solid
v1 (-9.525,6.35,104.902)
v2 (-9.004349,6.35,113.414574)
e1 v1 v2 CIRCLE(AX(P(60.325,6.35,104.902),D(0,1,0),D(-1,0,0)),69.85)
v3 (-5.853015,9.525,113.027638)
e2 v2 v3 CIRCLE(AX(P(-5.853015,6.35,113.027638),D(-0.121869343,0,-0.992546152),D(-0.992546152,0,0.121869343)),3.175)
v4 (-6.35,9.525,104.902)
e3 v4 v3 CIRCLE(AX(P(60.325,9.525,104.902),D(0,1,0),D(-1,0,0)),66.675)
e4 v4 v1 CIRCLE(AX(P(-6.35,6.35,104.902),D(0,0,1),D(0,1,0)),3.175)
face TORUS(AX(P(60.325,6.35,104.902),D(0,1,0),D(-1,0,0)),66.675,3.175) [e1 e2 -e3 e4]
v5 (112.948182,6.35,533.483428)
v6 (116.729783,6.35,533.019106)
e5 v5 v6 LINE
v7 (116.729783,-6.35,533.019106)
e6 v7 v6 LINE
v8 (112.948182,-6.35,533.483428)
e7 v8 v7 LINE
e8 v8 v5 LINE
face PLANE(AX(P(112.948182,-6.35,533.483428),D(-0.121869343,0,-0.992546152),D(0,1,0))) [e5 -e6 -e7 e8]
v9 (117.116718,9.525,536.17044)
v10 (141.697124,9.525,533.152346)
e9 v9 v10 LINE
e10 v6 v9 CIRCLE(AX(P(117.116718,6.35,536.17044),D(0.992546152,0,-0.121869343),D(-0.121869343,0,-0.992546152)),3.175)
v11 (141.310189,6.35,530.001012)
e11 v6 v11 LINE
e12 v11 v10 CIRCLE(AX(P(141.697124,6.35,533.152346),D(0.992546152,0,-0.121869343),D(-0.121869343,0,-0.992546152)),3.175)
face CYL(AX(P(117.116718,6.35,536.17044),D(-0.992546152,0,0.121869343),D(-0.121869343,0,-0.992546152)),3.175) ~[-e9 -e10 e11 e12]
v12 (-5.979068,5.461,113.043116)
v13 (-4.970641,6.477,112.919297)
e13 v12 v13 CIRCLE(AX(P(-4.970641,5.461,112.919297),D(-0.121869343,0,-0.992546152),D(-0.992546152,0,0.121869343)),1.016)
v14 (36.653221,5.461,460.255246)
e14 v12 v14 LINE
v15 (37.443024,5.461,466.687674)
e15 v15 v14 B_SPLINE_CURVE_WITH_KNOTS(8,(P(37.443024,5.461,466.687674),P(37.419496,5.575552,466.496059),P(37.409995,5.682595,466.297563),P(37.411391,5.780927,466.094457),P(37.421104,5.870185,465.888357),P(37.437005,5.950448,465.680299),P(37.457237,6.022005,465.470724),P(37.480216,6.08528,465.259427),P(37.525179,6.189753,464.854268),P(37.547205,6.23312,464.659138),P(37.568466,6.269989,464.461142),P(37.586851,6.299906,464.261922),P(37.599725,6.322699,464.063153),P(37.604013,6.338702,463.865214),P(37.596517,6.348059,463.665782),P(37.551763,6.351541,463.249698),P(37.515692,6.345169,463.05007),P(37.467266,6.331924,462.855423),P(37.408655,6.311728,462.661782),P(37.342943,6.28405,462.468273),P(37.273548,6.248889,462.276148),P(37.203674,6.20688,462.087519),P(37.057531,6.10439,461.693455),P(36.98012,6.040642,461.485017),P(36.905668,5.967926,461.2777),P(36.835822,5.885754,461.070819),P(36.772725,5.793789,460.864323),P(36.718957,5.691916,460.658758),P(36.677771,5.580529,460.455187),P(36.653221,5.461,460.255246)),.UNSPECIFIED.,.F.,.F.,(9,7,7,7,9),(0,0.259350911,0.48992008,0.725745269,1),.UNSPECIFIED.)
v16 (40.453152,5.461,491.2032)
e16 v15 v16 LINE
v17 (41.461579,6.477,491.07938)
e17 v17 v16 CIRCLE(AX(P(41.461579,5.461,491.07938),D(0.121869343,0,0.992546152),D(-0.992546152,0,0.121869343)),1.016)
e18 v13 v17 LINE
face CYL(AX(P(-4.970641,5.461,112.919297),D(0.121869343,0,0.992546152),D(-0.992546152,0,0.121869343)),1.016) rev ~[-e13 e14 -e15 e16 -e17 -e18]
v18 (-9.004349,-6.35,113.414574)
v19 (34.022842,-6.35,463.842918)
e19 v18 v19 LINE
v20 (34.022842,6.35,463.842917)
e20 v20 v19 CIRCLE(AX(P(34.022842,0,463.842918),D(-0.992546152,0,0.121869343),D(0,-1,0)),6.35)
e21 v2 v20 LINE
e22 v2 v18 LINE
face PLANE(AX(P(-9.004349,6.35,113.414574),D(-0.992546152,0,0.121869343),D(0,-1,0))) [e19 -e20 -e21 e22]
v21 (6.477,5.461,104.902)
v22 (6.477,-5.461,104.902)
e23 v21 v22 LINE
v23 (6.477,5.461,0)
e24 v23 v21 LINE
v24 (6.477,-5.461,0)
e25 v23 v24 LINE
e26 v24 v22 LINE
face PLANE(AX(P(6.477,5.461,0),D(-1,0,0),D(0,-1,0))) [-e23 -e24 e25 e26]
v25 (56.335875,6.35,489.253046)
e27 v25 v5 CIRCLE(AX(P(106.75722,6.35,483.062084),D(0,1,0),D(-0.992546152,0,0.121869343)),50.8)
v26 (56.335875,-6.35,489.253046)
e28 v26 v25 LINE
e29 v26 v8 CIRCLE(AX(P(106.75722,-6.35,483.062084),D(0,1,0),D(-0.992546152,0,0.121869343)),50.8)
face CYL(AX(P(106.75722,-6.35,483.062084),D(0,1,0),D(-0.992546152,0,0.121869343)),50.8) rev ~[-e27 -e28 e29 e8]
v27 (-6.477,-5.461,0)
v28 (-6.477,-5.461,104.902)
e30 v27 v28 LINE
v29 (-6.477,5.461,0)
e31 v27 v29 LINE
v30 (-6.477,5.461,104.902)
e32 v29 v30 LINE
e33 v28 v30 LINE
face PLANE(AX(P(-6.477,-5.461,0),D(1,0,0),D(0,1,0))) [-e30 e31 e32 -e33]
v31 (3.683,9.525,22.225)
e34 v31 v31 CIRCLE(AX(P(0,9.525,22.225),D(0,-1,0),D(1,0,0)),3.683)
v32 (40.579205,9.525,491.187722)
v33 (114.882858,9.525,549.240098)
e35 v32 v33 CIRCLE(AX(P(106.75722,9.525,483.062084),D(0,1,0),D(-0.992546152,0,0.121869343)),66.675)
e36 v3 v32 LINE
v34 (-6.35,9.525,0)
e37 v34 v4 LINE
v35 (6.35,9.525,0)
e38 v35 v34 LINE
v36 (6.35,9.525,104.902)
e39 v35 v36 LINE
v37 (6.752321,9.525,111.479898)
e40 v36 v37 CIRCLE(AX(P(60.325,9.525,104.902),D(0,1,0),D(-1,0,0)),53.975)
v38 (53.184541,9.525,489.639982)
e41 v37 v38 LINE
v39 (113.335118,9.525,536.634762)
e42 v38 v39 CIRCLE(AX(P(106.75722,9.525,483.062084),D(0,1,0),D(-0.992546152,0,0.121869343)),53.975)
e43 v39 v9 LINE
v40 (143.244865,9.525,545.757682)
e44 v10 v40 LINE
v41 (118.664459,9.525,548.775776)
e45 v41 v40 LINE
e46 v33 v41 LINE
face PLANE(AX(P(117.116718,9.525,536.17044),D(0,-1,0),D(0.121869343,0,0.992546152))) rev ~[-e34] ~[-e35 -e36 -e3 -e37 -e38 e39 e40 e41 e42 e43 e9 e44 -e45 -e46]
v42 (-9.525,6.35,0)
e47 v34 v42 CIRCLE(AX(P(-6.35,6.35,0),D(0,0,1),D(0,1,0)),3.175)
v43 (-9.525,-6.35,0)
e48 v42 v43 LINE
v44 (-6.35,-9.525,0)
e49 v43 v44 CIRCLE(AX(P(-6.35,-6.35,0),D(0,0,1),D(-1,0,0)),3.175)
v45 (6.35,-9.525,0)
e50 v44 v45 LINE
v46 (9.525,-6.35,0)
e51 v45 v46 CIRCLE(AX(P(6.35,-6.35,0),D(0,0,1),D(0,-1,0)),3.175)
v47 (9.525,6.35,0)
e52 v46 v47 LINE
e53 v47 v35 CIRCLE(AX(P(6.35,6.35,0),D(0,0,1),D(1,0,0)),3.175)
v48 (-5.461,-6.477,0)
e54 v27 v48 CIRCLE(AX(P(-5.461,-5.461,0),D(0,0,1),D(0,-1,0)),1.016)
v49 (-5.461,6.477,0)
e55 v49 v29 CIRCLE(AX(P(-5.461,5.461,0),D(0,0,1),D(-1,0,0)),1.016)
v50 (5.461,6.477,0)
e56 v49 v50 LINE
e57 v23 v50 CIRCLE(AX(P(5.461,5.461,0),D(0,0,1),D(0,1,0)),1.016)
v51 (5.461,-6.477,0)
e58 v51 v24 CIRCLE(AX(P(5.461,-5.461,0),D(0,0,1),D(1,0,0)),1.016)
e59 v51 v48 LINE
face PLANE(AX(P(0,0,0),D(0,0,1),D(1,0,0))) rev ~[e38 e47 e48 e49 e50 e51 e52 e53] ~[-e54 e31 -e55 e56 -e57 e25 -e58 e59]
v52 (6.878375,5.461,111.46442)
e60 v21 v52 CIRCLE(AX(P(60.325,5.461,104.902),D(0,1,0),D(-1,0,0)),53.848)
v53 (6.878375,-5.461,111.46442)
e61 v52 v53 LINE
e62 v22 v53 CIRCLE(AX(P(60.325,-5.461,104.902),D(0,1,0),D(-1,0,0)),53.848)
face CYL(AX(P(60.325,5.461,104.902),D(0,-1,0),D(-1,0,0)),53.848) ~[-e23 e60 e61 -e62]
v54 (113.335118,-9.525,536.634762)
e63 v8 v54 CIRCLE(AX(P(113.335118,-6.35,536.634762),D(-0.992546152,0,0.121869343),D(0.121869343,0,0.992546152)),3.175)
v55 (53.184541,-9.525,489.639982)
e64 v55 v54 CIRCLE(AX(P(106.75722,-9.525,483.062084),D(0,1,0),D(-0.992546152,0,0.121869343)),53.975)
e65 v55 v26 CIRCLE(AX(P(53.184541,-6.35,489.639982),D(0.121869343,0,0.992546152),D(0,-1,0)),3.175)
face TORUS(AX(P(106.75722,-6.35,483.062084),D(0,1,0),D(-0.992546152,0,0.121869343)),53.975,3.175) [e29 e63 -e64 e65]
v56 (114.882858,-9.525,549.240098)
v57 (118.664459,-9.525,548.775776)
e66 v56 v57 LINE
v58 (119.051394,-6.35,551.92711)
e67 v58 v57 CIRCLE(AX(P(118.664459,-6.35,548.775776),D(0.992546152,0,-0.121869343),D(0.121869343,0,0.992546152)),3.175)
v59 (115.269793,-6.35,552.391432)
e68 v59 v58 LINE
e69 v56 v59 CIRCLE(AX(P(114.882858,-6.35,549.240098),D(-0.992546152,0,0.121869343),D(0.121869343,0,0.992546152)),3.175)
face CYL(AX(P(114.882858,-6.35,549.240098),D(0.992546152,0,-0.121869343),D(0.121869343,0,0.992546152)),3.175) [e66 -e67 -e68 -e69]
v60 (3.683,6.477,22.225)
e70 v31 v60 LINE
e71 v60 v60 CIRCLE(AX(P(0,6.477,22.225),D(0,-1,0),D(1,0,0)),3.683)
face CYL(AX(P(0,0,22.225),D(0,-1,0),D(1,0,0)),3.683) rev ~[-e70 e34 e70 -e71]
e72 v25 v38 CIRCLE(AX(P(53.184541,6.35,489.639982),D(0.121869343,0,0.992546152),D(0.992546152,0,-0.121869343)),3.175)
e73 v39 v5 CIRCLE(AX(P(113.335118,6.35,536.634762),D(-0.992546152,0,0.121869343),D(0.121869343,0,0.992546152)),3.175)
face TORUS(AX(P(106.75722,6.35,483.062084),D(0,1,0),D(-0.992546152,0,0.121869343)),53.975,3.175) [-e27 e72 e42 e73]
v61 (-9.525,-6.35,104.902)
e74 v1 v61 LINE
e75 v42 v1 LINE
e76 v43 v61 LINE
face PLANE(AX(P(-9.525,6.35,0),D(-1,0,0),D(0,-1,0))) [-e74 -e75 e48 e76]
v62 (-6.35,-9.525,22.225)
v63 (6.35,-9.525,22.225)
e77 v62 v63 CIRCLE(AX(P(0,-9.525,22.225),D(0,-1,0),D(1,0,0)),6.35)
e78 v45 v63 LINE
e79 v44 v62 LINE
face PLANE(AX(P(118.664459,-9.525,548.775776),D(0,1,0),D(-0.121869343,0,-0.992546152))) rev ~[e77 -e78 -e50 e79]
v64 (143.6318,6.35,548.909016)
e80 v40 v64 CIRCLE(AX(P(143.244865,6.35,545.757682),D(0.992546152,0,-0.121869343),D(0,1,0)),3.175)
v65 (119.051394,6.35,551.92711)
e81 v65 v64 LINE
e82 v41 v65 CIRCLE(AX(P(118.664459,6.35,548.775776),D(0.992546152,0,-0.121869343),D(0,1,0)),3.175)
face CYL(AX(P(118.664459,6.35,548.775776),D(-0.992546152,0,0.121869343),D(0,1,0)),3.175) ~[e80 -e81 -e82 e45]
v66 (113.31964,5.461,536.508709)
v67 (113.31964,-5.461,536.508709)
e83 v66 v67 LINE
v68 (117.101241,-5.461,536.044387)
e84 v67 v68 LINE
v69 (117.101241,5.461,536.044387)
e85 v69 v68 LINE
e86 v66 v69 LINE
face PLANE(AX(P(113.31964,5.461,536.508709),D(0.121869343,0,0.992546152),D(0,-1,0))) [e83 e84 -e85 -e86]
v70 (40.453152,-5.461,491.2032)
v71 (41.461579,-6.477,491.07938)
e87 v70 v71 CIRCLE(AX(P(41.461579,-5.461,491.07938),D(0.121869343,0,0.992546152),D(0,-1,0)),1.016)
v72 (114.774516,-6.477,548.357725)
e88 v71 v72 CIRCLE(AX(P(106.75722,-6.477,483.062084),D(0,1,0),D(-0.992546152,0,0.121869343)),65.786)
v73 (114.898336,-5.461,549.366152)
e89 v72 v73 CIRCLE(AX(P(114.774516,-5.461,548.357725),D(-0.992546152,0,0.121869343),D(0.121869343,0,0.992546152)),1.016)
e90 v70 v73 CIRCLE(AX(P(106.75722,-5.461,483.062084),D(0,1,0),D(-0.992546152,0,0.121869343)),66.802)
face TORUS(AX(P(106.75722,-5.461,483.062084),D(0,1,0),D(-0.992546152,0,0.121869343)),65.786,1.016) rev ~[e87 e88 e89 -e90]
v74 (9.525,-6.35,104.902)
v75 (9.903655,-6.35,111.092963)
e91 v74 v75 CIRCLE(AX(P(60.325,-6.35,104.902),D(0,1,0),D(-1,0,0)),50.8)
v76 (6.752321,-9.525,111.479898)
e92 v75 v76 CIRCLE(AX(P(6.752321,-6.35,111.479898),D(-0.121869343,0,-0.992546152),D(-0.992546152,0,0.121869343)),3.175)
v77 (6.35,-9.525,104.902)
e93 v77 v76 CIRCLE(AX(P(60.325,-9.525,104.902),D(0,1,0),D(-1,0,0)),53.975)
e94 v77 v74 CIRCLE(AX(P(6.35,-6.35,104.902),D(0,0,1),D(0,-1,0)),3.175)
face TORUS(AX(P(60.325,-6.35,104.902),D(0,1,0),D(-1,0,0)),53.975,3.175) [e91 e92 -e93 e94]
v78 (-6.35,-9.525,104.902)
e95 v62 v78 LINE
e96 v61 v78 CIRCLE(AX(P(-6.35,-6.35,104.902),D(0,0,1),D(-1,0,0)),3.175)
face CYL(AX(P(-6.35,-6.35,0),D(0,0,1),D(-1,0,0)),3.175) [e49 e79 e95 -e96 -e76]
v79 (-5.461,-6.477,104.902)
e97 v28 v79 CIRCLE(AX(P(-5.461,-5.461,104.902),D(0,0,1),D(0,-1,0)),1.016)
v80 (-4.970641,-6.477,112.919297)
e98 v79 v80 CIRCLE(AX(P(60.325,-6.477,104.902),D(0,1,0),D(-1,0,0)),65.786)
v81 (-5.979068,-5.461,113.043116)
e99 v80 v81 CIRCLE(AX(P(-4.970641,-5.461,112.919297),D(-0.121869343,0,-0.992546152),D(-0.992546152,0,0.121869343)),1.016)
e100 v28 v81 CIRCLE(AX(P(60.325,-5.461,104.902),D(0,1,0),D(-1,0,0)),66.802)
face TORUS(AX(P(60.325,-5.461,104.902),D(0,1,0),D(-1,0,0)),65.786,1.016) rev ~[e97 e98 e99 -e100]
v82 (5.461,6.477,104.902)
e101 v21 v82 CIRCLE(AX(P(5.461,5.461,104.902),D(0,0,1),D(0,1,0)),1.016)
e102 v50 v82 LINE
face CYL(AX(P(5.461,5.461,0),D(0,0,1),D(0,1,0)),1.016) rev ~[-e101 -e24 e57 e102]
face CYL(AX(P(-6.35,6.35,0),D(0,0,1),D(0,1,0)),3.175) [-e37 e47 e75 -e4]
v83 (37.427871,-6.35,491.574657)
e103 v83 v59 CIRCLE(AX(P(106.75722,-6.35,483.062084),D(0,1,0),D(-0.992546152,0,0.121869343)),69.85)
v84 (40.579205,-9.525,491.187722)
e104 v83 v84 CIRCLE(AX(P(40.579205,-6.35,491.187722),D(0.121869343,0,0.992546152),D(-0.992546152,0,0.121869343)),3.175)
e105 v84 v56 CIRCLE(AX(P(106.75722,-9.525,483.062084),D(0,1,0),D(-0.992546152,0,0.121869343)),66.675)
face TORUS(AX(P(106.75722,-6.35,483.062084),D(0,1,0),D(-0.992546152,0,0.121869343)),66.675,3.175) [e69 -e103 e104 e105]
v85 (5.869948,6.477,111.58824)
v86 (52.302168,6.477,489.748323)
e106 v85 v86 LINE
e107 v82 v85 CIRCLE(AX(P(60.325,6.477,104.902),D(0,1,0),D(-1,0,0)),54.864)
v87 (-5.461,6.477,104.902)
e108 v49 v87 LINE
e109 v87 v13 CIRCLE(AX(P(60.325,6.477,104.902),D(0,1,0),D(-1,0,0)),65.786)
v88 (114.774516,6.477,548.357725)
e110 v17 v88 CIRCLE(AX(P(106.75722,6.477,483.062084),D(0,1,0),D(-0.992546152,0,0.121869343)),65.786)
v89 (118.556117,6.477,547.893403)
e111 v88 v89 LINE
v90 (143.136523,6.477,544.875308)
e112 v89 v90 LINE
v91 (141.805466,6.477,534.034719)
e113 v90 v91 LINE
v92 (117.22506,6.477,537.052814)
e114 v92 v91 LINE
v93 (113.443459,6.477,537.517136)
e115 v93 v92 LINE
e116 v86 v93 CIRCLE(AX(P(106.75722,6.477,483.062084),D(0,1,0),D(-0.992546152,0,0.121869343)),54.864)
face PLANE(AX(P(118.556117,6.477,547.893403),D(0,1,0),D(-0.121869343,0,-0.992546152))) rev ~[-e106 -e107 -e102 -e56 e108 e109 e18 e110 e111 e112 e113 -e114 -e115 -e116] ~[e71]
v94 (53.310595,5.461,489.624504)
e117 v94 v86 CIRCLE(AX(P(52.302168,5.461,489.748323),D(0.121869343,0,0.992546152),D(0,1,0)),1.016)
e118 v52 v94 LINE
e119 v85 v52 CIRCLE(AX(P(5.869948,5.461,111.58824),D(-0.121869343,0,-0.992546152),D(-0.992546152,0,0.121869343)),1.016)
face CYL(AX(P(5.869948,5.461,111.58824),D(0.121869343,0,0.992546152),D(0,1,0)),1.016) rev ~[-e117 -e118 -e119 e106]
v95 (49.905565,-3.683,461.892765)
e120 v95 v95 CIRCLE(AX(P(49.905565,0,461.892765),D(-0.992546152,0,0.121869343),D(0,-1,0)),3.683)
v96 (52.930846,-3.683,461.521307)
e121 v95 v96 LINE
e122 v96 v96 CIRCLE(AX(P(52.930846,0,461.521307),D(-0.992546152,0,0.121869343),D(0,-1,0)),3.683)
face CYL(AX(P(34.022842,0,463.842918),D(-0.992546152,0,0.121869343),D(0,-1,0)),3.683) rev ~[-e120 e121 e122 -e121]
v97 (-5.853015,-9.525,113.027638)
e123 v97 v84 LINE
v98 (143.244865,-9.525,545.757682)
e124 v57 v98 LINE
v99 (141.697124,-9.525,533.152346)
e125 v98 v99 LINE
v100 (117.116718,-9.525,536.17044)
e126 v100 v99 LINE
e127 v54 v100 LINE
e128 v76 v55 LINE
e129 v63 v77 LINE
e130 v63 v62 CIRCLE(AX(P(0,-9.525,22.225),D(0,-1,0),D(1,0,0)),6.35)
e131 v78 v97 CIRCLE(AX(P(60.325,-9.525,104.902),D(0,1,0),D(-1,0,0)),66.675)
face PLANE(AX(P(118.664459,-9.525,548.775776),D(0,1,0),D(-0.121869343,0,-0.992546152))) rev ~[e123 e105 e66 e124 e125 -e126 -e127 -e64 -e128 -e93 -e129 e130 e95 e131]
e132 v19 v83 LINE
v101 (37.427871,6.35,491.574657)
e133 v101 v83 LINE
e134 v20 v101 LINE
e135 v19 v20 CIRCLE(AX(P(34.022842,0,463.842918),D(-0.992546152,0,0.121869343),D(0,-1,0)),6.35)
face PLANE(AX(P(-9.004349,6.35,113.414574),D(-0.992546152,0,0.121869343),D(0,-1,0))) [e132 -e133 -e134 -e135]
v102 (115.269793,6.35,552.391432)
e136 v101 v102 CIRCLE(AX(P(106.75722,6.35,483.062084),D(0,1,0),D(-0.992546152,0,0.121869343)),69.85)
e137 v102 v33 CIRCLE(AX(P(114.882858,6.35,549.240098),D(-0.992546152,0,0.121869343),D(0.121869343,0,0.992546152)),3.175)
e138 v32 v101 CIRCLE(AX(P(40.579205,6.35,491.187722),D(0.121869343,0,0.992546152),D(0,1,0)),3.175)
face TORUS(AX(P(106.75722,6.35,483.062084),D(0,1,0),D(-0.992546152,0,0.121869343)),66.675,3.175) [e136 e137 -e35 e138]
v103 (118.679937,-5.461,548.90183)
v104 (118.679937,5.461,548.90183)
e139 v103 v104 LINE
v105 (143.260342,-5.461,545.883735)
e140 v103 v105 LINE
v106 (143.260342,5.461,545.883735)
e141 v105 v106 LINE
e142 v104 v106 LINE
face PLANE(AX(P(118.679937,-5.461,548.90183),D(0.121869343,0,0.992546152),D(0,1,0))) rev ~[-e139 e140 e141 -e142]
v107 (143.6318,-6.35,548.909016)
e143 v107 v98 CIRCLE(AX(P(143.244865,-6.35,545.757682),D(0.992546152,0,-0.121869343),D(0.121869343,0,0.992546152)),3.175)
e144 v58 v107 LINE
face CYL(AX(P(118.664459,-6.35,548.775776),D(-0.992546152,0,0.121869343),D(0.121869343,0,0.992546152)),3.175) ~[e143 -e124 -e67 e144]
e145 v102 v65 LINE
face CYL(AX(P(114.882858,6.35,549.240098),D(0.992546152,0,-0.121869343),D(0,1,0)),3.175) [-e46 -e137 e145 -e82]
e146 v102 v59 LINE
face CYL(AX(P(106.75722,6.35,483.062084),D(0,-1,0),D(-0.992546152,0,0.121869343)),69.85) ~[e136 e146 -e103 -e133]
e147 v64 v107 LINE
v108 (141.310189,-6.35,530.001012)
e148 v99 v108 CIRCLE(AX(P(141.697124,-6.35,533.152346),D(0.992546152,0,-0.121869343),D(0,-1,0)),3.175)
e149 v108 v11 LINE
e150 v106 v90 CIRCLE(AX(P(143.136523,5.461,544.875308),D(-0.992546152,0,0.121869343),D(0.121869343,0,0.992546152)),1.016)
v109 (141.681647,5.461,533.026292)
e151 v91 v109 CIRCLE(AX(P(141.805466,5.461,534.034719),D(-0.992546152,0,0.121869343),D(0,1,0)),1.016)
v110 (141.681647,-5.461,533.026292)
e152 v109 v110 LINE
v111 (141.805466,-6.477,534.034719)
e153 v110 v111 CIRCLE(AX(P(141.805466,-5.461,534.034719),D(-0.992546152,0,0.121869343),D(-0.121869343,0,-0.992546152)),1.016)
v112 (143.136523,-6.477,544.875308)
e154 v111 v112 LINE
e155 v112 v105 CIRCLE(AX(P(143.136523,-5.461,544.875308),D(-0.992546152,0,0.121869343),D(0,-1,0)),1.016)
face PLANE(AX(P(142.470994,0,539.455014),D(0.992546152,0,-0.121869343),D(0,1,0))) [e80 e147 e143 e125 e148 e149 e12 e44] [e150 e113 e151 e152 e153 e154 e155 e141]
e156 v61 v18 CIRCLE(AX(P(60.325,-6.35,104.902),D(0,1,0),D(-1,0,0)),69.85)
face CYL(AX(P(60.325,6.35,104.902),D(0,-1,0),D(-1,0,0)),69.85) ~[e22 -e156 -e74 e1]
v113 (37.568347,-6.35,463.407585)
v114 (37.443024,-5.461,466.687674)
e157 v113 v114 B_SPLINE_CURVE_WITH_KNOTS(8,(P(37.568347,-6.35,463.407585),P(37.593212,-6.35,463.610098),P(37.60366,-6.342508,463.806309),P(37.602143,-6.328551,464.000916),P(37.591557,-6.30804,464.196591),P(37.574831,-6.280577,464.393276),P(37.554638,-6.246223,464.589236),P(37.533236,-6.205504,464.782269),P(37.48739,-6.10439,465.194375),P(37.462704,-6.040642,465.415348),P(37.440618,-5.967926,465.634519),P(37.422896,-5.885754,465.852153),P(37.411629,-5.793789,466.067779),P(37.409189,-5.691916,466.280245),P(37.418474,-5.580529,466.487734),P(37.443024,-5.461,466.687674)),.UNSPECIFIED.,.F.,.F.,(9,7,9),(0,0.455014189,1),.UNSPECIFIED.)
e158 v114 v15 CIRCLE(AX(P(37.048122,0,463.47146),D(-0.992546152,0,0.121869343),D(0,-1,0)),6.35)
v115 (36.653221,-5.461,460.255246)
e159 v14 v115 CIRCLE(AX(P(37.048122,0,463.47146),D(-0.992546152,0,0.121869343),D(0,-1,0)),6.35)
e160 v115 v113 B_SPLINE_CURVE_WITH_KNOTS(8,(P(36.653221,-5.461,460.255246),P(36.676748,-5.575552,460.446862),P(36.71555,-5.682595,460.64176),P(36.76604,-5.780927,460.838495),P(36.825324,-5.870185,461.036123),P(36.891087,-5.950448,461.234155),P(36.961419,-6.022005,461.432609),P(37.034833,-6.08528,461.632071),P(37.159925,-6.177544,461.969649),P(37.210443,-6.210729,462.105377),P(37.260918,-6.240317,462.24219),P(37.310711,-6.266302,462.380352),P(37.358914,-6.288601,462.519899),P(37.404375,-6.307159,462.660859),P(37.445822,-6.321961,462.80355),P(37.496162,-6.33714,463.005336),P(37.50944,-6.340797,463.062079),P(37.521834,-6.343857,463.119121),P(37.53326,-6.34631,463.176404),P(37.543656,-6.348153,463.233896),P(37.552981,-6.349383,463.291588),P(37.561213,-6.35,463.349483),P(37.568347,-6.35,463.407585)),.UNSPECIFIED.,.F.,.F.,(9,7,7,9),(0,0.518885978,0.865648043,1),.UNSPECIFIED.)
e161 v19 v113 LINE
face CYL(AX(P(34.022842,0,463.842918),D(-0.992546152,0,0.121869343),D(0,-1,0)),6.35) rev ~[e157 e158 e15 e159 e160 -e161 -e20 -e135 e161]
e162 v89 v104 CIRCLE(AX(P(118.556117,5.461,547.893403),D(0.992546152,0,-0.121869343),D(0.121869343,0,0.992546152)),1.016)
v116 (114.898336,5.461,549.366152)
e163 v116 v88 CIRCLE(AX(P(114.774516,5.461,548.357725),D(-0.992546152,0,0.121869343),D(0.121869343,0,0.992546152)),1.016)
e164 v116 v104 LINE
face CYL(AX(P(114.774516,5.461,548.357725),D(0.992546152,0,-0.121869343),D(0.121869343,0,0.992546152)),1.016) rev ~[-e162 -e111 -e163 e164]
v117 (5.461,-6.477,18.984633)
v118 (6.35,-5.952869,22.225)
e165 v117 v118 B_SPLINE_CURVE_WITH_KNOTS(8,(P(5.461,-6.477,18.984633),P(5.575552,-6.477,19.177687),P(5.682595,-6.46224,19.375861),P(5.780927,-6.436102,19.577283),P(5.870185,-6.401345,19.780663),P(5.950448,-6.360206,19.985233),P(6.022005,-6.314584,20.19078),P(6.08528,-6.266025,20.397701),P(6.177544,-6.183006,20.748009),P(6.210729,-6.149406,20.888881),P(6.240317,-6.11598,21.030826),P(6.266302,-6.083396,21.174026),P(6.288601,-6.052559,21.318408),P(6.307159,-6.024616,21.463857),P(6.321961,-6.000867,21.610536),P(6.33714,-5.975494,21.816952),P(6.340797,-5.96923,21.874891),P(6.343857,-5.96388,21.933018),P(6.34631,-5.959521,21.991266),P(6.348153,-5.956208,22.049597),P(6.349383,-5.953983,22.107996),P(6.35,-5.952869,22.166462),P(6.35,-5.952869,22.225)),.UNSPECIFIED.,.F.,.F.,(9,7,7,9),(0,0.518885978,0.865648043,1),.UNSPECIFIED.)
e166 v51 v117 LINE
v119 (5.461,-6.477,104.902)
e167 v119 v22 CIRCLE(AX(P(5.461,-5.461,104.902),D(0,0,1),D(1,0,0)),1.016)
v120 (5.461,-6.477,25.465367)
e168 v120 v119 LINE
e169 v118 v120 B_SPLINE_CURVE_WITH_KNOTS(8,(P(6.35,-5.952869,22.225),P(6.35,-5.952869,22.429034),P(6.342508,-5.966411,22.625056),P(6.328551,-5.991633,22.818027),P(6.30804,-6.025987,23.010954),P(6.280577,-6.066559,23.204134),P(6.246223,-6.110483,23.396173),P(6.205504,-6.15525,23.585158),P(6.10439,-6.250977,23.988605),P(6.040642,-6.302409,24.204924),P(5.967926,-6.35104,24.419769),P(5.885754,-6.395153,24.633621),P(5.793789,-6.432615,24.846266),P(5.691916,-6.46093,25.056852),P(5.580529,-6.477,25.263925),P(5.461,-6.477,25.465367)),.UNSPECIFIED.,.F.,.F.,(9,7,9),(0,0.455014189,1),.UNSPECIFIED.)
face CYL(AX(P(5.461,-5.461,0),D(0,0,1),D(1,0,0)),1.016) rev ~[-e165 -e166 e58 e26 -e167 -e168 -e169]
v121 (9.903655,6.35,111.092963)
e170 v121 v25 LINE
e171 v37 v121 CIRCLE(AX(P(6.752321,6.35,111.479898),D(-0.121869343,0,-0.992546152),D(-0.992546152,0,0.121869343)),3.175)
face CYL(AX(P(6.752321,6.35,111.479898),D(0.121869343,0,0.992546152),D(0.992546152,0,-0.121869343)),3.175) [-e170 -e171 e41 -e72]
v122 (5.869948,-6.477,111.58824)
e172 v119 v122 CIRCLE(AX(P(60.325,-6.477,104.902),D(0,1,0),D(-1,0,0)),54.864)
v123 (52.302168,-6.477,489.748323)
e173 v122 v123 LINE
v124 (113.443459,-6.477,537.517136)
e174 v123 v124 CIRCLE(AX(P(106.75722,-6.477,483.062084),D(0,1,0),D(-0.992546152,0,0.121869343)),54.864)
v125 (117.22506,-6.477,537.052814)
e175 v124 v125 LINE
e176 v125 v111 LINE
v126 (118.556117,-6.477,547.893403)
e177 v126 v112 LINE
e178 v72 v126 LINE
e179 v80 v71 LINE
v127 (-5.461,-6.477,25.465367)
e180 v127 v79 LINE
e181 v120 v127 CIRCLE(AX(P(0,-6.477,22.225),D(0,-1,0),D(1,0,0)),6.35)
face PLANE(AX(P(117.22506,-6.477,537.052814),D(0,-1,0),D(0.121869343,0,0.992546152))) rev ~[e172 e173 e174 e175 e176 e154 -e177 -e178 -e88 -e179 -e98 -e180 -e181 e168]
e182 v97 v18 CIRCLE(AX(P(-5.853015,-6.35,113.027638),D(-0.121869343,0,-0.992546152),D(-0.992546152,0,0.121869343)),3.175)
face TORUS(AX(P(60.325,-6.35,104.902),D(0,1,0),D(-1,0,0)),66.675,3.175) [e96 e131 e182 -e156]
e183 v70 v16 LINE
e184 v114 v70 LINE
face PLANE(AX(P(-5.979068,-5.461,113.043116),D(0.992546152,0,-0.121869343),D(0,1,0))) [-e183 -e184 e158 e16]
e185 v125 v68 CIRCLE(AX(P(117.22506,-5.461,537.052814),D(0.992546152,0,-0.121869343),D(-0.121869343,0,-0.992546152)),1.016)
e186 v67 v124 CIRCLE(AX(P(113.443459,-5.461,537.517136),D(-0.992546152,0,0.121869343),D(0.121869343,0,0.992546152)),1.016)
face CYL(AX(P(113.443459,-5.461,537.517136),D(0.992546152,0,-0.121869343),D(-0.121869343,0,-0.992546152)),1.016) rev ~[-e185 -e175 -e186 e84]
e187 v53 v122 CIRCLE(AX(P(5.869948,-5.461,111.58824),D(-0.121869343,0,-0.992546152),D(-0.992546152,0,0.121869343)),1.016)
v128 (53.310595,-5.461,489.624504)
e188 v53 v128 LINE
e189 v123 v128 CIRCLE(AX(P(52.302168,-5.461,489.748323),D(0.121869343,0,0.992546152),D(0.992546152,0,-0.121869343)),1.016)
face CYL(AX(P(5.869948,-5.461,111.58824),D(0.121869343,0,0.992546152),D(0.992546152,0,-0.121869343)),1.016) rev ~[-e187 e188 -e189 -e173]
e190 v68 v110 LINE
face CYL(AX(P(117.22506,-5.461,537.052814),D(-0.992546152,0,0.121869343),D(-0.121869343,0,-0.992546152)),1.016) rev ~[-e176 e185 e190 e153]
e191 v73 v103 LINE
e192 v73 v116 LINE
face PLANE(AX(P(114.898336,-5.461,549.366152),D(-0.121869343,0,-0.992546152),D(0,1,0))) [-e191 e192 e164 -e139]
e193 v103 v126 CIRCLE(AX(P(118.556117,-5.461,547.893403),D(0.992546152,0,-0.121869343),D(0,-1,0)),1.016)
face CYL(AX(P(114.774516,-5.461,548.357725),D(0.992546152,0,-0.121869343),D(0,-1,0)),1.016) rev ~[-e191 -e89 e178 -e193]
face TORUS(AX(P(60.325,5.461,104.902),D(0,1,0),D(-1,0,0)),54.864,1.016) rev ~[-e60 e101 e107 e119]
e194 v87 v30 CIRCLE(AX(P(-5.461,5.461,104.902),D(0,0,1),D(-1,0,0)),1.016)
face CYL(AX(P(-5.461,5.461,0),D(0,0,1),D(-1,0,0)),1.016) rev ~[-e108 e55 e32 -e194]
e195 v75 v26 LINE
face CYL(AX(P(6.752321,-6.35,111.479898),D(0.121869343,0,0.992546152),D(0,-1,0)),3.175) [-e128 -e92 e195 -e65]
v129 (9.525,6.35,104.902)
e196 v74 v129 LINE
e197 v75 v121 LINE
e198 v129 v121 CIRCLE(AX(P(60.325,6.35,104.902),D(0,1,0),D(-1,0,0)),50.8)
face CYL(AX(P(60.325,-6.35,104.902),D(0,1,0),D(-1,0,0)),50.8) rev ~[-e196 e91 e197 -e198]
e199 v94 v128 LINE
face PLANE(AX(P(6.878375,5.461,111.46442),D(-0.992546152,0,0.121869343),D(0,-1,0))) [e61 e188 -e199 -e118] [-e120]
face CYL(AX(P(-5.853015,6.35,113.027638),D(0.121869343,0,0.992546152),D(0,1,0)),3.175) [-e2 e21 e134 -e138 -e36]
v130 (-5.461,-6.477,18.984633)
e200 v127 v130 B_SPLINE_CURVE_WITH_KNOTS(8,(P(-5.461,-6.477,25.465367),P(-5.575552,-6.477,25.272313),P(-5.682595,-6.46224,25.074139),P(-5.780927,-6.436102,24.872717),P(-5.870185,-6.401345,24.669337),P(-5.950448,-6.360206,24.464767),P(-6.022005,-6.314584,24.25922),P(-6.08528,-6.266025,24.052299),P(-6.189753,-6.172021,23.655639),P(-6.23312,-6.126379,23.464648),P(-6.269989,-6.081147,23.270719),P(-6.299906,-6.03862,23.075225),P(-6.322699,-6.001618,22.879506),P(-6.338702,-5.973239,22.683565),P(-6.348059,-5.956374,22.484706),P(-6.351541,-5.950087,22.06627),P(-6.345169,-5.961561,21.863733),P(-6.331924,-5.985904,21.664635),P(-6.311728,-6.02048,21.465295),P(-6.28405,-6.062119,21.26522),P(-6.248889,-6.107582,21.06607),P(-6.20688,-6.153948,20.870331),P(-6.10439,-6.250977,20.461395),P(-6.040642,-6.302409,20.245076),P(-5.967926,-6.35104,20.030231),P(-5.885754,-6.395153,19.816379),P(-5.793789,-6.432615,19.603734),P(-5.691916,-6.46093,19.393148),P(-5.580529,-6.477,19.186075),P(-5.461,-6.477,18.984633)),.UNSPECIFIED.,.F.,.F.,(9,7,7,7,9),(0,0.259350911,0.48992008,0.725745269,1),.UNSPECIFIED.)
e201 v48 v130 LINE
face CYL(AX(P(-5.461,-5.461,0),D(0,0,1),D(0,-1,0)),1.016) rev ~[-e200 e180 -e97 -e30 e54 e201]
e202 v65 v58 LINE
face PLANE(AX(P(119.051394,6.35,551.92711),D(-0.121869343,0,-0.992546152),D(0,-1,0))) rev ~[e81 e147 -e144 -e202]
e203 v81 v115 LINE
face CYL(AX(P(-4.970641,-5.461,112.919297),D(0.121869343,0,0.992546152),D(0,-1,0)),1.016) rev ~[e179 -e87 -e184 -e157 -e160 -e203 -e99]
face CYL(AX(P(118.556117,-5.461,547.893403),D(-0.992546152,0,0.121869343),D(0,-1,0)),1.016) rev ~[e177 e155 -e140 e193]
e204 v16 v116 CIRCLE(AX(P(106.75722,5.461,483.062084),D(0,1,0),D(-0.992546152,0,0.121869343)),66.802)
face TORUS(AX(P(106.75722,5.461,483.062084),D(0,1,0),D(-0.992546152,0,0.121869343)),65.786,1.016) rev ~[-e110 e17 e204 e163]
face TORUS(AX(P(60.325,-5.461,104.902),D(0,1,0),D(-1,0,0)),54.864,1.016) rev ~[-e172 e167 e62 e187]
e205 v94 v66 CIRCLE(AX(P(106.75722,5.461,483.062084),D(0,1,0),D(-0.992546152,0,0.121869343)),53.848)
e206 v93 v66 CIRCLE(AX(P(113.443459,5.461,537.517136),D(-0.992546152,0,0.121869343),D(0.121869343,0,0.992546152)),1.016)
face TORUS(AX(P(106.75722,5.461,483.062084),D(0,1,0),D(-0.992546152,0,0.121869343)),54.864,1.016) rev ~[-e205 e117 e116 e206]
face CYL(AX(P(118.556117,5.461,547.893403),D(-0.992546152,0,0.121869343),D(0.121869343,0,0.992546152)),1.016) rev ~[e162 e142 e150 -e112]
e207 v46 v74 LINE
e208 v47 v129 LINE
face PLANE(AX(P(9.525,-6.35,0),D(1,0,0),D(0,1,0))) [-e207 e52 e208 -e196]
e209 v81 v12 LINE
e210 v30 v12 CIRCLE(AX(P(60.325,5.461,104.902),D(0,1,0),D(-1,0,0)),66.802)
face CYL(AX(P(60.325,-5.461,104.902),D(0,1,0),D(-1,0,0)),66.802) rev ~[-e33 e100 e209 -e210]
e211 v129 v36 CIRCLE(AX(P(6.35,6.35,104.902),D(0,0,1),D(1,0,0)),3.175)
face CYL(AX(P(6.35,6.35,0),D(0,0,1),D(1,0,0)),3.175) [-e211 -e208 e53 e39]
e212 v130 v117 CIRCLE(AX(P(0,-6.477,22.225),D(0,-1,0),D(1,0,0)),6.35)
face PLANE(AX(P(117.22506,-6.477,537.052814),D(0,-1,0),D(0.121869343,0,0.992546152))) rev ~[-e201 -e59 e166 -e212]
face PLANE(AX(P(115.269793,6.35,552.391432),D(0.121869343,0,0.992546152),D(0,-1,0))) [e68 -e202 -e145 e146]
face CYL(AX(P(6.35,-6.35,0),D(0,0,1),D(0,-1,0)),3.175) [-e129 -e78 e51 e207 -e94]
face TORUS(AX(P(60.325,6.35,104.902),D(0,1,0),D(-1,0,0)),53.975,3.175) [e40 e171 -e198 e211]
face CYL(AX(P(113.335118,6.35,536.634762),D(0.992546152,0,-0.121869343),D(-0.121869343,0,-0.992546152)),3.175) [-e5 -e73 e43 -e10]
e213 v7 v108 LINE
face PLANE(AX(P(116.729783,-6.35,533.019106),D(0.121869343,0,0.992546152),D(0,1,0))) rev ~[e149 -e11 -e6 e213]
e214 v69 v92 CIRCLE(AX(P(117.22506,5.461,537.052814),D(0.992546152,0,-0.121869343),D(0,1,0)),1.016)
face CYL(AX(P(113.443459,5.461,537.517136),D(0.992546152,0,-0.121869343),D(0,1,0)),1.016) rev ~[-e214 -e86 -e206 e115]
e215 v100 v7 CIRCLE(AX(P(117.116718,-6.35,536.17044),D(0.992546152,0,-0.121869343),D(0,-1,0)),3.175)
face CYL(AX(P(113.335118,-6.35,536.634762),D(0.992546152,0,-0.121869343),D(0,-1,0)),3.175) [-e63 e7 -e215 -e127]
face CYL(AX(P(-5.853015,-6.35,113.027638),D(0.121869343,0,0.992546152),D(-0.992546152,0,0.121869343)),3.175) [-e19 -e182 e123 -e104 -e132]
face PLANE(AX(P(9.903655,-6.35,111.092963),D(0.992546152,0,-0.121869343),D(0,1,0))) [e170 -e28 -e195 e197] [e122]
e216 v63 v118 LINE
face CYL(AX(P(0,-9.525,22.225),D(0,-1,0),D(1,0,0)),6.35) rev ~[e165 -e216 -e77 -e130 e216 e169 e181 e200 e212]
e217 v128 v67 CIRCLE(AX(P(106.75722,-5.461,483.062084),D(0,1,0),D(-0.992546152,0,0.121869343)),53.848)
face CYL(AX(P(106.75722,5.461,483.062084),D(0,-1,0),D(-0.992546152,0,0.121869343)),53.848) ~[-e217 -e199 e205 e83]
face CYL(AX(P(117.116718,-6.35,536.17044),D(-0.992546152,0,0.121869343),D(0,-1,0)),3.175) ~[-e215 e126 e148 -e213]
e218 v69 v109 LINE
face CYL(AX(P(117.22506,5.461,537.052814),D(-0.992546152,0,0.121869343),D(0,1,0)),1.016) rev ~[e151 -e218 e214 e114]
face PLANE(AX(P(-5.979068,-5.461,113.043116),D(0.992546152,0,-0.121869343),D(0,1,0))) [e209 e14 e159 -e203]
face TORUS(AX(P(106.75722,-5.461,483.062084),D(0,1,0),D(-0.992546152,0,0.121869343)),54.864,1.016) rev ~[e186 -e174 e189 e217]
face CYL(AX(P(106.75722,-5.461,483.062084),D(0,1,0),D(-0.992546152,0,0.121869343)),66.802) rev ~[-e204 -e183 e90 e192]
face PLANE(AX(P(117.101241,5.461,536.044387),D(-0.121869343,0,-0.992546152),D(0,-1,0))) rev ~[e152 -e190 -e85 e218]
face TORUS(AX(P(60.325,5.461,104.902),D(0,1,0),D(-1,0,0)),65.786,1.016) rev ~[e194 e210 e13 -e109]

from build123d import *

# Parameters (mm, degrees)
F4_R      = 3.683
F5_DEPTH  = 334.01
F6_R      = 3.683
F7_DEPTH  = 25.4
F8_R      = 6.35
F9_DEPTH  = 9.4742
F11_DEPTH = 24.765
F12_R     = 6.35
F13_DEPTH = 12.446


# Not quite as in the source:
# - a feature names something its author has since deleted; it is built from what else it names


with BuildPart() as f2:
    # F2: sweep along a path in F0
    with BuildLine(Plane.XZ) as f2_path:
        Line((0, 0), (0, 104.902))
        ThreePointArc((0, 104.902), (0.1125182852, 108.5847531474), (0.4496534022, 112.2537681409))
        Line((0.4496534022, 112.2537681409), (46.8818732396, 490.4138519163))
        ThreePointArc((46.8818732396, 490.4138519163), (69.6174413383, 530.5988324867), (114.1089879783, 542.9374303731))
        Line((114.1089879783, 542.9374303731), (117.890588816, 542.4731081747))
    # F1 (on Top) → F2 (sweep)
    with BuildSketch(Plane.XY):
        with BuildLine():
            ThreePointArc((-9.525, -6.35), (-8.5950640303, -8.5950640303), (-6.35, -9.525))
            Line((-6.35, -9.525), (6.35, -9.525))
            ThreePointArc((6.35, -9.525), (8.5950640303, -8.5950640303), (9.525, -6.35))
            Line((9.525, -6.35), (9.525, 6.35))
            ThreePointArc((9.525, 6.35), (8.5950640303, 8.5950640303), (6.35, 9.525))
            Line((6.35, 9.525), (-6.35, 9.525))
            ThreePointArc((-6.35, 9.525), (-8.5950640303, 8.5950640303), (-9.525, 6.35))
            Line((-9.525, 6.35), (-9.525, -6.35))
        make_face()
        with BuildLine():
            Line((5.461, -6.477), (-5.461, -6.477))
            ThreePointArc((-5.461, -6.477), (-6.1794204897, -6.1794204897), (-6.477, -5.461))
            Line((-6.477, -5.461), (-6.477, 5.461))
            ThreePointArc((-6.477, 5.461), (-6.1794204897, 6.1794204897), (-5.461, 6.477))
            Line((-5.461, 6.477), (5.461, 6.477))
            ThreePointArc((5.461, 6.477), (6.1794204897, 6.1794204897), (6.477, 5.461))
            Line((6.477, 5.461), (6.477, -5.461))
            ThreePointArc((6.477, -5.461), (6.1794204897, -6.1794204897), (5.461, -6.477))
        make_face(mode=Mode.SUBTRACT)
    sweep(path=f2_path.line)

    # F4 (on Front) → F5 (cut, symmetric)
    with BuildSketch(Plane.XZ):
        with Locations((0, 22.225)):
            Circle(F4_R)
    extrude(amount=F5_DEPTH, both=True, mode=Mode.SUBTRACT)

    # F6 (on face) → F7 (cut)
    with BuildSketch(Plane(origin=(-22.5893491944, 0, 2.7736233219), x_dir=(0, -1, 0), z_dir=(-0.9925461516, 0, 0.1218693434))):
        with Locations((0, 464.5318445404)):
            Circle(F6_R)
    extrude(amount=-F7_DEPTH, mode=Mode.SUBTRACT)

    # F8 (on face) → F9 (cut)
    with BuildSketch(Plane(origin=(-22.5893491944, 0, 2.7736233219), x_dir=(0, -1, 0), z_dir=(-0.9925461516, 0, 0.1218693434))):
        with Locations((0, 464.5318445404)):
            Circle(F8_R)
    extrude(amount=-F9_DEPTH, mode=Mode.SUBTRACT)

    # F10 (on face) → F11 (join)
    with BuildSketch(Plane(origin=(50.5216003355, 0, -6.2032725133), x_dir=(0, 1, 0), z_dir=(0.9925461516, 0, -0.1218693434))):
        with BuildLine():
            ThreePointArc((9.525, 559.1468445404), (8.5950640303, 561.3919085707), (6.35, 562.3218445404))
            Line((6.35, 562.3218445404), (-6.35, 562.3218445404))
            ThreePointArc((-6.35, 562.3218445404), (-8.5950640303, 561.3919085707), (-9.525, 559.1468445404))
            Line((-9.525, 559.1468445404), (-9.525, 546.4468445404))
            ThreePointArc((-9.525, 546.4468445404), (-8.5950640303, 544.2017805101), (-6.35, 543.2718445404))
            Line((-6.35, 543.2718445404), (6.35, 543.2718445404))
            ThreePointArc((6.35, 543.2718445404), (8.5950640303, 544.2017805101), (9.525, 546.4468445404))
            Line((9.525, 546.4468445404), (9.525, 559.1468445404))
        make_face()
        with BuildLine():
            ThreePointArc((-6.477, 558.2578445404), (-6.1794204897, 558.9762650301), (-5.461, 559.2738445404))
            Line((-5.461, 559.2738445404), (5.461, 559.2738445404))
            ThreePointArc((5.461, 559.2738445404), (6.1794204897, 558.9762650301), (6.477, 558.2578445404))
            Line((6.477, 558.2578445404), (6.477, 547.3358445404))
            ThreePointArc((6.477, 547.3358445404), (6.1794204897, 546.6174240507), (5.461, 546.3198445404))
            Line((5.461, 546.3198445404), (-5.461, 546.3198445404))
            ThreePointArc((-5.461, 546.3198445404), (-6.1794204897, 546.6174240507), (-6.477, 547.3358445404))
            Line((-6.477, 547.3358445404), (-6.477, 558.2578445404))
        make_face(mode=Mode.SUBTRACT)
    extrude(amount=F11_DEPTH)

    # F12 (on face) → F13 (cut)
    with BuildSketch(Plane.XZ.offset(9.525)):
        with Locations((0, 22.225)):
            Circle(F12_R)
    extrude(amount=-F13_DEPTH, mode=Mode.SUBTRACT)


solid = f2.part
